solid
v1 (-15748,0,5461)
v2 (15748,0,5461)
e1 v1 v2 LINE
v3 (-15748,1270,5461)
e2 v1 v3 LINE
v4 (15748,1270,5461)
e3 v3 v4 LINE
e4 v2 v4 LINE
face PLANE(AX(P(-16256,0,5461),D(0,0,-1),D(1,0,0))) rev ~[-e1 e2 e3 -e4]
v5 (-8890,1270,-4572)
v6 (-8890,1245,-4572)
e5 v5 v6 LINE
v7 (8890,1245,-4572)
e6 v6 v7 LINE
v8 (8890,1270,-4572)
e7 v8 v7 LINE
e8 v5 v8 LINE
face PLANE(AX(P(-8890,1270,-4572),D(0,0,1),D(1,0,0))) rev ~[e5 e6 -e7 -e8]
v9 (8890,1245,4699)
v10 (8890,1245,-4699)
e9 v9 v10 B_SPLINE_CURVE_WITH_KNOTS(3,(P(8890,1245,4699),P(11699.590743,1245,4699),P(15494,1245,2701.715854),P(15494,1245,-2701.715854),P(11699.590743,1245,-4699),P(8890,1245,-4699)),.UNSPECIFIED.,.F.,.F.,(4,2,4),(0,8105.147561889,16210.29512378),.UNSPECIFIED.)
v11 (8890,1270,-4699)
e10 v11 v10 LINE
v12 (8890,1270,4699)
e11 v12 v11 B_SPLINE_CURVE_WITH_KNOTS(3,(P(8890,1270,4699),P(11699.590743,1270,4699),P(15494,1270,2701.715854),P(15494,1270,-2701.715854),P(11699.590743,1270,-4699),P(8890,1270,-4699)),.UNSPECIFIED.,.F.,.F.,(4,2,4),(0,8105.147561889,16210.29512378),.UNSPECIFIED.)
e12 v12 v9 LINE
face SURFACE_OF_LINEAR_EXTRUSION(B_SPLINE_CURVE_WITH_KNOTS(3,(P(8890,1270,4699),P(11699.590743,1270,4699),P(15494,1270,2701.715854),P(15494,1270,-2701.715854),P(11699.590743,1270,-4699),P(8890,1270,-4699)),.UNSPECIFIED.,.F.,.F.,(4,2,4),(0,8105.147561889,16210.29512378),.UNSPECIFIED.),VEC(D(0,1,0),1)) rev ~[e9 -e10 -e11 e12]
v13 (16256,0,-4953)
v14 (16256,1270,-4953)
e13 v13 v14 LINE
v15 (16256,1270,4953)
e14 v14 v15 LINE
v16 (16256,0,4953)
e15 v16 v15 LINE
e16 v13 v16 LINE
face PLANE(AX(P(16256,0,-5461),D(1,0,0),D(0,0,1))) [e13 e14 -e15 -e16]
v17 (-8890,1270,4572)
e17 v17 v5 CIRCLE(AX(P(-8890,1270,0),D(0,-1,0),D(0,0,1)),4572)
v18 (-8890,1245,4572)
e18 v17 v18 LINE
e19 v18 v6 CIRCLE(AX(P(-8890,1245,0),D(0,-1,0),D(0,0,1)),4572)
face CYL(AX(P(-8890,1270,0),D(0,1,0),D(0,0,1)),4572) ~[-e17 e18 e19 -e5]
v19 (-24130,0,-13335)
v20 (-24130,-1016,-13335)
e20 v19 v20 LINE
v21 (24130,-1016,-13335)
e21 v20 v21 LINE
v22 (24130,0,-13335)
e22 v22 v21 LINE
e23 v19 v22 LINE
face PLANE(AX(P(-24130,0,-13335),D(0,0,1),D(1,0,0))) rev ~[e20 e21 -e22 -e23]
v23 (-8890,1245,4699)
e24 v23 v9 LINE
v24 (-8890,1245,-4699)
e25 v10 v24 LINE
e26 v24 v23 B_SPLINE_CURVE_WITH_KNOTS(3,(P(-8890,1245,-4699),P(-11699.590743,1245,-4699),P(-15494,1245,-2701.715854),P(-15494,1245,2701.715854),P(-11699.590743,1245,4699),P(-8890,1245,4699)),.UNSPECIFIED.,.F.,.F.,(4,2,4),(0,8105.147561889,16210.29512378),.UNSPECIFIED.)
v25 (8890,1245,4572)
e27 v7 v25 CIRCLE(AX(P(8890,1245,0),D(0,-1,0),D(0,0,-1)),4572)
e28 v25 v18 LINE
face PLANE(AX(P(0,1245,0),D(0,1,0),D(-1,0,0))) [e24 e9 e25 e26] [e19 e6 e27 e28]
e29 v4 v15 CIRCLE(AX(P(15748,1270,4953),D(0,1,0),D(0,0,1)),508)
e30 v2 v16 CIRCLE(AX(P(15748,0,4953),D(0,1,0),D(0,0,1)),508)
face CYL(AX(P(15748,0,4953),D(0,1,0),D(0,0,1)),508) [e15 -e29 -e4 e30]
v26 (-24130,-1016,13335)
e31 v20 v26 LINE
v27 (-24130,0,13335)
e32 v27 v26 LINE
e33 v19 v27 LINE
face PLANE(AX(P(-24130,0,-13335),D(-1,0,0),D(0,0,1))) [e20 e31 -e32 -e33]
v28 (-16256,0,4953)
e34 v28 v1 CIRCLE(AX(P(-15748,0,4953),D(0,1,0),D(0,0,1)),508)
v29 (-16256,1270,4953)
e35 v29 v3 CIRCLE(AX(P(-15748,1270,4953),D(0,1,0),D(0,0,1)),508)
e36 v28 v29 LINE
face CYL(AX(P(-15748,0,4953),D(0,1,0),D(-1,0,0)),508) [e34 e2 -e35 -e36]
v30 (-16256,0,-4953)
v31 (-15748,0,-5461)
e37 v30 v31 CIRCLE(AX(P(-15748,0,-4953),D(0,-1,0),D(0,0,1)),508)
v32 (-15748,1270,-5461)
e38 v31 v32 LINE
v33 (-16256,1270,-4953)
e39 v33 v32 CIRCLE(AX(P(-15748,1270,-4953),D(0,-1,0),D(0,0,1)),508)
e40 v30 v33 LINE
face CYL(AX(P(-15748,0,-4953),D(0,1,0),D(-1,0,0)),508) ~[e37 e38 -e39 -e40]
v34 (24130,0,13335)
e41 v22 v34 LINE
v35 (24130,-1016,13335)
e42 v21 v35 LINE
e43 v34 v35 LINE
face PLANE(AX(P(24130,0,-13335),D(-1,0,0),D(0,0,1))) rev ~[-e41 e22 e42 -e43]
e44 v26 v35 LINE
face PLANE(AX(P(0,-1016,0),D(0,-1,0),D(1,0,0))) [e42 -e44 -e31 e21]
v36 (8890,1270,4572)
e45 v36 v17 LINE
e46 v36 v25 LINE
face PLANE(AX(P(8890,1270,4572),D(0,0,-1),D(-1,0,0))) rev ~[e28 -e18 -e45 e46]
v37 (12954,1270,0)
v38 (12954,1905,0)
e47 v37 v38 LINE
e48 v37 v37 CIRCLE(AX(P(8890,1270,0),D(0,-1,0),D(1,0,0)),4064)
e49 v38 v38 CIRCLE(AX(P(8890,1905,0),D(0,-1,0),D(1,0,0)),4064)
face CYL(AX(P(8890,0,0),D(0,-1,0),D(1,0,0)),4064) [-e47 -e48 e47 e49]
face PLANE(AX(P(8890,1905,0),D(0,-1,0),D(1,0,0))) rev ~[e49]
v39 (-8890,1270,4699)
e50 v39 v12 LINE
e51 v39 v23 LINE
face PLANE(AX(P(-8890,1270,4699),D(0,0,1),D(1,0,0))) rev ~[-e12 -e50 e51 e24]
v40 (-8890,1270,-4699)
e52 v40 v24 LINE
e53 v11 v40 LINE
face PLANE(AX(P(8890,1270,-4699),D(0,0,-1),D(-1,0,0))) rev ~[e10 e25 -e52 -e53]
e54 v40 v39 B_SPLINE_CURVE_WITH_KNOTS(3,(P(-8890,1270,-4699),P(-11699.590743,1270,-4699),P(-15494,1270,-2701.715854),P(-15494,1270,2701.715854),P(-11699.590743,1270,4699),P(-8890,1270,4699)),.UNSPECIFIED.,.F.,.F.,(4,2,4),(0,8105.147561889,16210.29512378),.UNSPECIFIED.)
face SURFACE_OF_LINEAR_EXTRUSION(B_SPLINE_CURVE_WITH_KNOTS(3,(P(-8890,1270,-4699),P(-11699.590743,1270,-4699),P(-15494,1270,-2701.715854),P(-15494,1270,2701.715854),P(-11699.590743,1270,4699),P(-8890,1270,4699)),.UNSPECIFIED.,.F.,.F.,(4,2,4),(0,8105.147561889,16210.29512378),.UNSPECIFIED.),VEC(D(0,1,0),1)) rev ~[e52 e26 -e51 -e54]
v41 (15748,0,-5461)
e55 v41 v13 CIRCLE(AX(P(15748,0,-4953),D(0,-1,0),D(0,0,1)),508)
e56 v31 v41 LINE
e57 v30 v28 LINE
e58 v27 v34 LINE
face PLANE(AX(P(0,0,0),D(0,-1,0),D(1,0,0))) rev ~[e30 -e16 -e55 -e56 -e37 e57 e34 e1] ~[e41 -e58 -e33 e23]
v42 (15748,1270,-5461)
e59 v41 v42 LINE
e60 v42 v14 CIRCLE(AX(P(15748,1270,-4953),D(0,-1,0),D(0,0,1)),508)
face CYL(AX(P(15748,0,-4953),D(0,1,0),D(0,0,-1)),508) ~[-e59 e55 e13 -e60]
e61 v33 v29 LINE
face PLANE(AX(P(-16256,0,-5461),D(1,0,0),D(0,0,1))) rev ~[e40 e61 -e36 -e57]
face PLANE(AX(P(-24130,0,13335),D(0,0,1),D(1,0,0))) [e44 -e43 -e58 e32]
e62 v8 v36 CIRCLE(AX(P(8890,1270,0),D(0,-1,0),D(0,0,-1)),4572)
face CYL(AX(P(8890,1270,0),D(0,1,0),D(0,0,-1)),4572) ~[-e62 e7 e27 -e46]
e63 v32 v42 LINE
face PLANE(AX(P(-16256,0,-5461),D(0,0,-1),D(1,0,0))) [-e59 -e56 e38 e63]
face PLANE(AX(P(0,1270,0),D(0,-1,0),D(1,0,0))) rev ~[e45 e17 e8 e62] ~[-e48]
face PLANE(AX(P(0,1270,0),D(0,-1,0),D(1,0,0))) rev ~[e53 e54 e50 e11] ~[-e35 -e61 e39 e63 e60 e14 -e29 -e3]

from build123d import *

# Parameters (mm, degrees)
F0_W     = 48260
F0_H     = 26670
F0_W_2   = 32512
F0_H_2   = 10922
F0_W_3   = 30988
F0_H_3   = 9398
F0_R     = 4064
F1_DEPTH = 1016
F2_DEPTH = 1270
F3_DEPTH = 1905
F4_R     = 508
F6_DEPTH = 25


with BuildPart() as f1:
    # F0 (on Front) → F1 (new body)
    with BuildSketch(Plane.XZ):
        Rectangle(F0_W, F0_H)
        Rectangle(F0_W_2, F0_H_2, mode=Mode.SUBTRACT)
        Rectangle(F0_W_2, F0_H_2)
        Rectangle(F0_W_3, F0_H_3, mode=Mode.SUBTRACT)
        Rectangle(F0_W_3, F0_H_3)
        with Locations((8890, 0)):
            Circle(F0_R, mode=Mode.SUBTRACT)
        with Locations((8890, 0)):
            Circle(F0_R)
    extrude(amount=F1_DEPTH)

    # F0 (on Front) → F2 (join)
    with BuildSketch(Plane.XZ):
        Rectangle(F0_W_2, F0_H_2)
        Rectangle(F0_W_3, F0_H_3, mode=Mode.SUBTRACT)
        Rectangle(F0_W_3, F0_H_3)
        with Locations((8890, 0)):
            Circle(F0_R, mode=Mode.SUBTRACT)
    extrude(amount=-F2_DEPTH)

    # F0 (on Front) → F3 (join)
    with BuildSketch(Plane.XZ):
        with Locations((8890, 0)):
            Circle(F0_R)
    extrude(amount=-F3_DEPTH)

    # F4
    f4_edges = [f1.edges().sort_by_distance(p)[0] for p in [
        (16256, 635, -5461),
        (16256, 635, 5461),
        (-16256, 635, -5461),
        (-16256, 635, 5461),
    ]]
    fillet(f4_edges, radius=F4_R)

    # F5 (on face) → F6 (cut)
    with BuildSketch(Plane(origin=(0, 1270, 0), x_dir=(-1, 0, 0), z_dir=(0, 1, 0))):
        with BuildLine():
            Line((8890, 4699), (-8890, 4699))
            add(Edge.make_bspline(
                [(-15494, 0), (-15494, 2701.7158539631), (-11699.5907432682, 4699), (-8890, 4699)],
                knots=[0, 0, 0, 0, 8105.1475618893, 8105.1475618893, 8105.1475618893, 8105.1475618893], degree=3))
            add(Edge.make_bspline(
                [(-15494, 0), (-15494, -2701.7158539631), (-11699.5907432682, -4699), (-8890, -4699)],
                knots=[0, 0, 0, 0, 8105.1475618893, 8105.1475618893, 8105.1475618893, 8105.1475618893], degree=3))
            Line((-8890, -4699), (8890, -4699))
            add(Edge.make_bspline(
                [(15494, 0), (15494, -2701.7158539631), (11699.5907432682, -4699), (8890, -4699)],
                knots=[0, 0, 0, 0, 8105.1475618893, 8105.1475618893, 8105.1475618893, 8105.1475618893], degree=3))
            add(Edge.make_bspline(
                [(15494, 0), (15494, 2701.7158539631), (11699.5907432682, 4699), (8890, 4699)],
                knots=[0, 0, 0, 0, 8105.1475618893, 8105.1475618893, 8105.1475618893, 8105.1475618893], degree=3))
        make_face()
        with BuildLine():
            Line((-8890, 4572), (8890, 4572))
            ThreePointArc((8890, 4572), (13462, 0), (8890, -4572))
            Line((8890, -4572), (-8890, -4572))
            ThreePointArc((-8890, -4572), (-13462, 0), (-8890, 4572))
        make_face(mode=Mode.SUBTRACT)
    extrude(amount=-F6_DEPTH, mode=Mode.SUBTRACT)


solid = f1.part
